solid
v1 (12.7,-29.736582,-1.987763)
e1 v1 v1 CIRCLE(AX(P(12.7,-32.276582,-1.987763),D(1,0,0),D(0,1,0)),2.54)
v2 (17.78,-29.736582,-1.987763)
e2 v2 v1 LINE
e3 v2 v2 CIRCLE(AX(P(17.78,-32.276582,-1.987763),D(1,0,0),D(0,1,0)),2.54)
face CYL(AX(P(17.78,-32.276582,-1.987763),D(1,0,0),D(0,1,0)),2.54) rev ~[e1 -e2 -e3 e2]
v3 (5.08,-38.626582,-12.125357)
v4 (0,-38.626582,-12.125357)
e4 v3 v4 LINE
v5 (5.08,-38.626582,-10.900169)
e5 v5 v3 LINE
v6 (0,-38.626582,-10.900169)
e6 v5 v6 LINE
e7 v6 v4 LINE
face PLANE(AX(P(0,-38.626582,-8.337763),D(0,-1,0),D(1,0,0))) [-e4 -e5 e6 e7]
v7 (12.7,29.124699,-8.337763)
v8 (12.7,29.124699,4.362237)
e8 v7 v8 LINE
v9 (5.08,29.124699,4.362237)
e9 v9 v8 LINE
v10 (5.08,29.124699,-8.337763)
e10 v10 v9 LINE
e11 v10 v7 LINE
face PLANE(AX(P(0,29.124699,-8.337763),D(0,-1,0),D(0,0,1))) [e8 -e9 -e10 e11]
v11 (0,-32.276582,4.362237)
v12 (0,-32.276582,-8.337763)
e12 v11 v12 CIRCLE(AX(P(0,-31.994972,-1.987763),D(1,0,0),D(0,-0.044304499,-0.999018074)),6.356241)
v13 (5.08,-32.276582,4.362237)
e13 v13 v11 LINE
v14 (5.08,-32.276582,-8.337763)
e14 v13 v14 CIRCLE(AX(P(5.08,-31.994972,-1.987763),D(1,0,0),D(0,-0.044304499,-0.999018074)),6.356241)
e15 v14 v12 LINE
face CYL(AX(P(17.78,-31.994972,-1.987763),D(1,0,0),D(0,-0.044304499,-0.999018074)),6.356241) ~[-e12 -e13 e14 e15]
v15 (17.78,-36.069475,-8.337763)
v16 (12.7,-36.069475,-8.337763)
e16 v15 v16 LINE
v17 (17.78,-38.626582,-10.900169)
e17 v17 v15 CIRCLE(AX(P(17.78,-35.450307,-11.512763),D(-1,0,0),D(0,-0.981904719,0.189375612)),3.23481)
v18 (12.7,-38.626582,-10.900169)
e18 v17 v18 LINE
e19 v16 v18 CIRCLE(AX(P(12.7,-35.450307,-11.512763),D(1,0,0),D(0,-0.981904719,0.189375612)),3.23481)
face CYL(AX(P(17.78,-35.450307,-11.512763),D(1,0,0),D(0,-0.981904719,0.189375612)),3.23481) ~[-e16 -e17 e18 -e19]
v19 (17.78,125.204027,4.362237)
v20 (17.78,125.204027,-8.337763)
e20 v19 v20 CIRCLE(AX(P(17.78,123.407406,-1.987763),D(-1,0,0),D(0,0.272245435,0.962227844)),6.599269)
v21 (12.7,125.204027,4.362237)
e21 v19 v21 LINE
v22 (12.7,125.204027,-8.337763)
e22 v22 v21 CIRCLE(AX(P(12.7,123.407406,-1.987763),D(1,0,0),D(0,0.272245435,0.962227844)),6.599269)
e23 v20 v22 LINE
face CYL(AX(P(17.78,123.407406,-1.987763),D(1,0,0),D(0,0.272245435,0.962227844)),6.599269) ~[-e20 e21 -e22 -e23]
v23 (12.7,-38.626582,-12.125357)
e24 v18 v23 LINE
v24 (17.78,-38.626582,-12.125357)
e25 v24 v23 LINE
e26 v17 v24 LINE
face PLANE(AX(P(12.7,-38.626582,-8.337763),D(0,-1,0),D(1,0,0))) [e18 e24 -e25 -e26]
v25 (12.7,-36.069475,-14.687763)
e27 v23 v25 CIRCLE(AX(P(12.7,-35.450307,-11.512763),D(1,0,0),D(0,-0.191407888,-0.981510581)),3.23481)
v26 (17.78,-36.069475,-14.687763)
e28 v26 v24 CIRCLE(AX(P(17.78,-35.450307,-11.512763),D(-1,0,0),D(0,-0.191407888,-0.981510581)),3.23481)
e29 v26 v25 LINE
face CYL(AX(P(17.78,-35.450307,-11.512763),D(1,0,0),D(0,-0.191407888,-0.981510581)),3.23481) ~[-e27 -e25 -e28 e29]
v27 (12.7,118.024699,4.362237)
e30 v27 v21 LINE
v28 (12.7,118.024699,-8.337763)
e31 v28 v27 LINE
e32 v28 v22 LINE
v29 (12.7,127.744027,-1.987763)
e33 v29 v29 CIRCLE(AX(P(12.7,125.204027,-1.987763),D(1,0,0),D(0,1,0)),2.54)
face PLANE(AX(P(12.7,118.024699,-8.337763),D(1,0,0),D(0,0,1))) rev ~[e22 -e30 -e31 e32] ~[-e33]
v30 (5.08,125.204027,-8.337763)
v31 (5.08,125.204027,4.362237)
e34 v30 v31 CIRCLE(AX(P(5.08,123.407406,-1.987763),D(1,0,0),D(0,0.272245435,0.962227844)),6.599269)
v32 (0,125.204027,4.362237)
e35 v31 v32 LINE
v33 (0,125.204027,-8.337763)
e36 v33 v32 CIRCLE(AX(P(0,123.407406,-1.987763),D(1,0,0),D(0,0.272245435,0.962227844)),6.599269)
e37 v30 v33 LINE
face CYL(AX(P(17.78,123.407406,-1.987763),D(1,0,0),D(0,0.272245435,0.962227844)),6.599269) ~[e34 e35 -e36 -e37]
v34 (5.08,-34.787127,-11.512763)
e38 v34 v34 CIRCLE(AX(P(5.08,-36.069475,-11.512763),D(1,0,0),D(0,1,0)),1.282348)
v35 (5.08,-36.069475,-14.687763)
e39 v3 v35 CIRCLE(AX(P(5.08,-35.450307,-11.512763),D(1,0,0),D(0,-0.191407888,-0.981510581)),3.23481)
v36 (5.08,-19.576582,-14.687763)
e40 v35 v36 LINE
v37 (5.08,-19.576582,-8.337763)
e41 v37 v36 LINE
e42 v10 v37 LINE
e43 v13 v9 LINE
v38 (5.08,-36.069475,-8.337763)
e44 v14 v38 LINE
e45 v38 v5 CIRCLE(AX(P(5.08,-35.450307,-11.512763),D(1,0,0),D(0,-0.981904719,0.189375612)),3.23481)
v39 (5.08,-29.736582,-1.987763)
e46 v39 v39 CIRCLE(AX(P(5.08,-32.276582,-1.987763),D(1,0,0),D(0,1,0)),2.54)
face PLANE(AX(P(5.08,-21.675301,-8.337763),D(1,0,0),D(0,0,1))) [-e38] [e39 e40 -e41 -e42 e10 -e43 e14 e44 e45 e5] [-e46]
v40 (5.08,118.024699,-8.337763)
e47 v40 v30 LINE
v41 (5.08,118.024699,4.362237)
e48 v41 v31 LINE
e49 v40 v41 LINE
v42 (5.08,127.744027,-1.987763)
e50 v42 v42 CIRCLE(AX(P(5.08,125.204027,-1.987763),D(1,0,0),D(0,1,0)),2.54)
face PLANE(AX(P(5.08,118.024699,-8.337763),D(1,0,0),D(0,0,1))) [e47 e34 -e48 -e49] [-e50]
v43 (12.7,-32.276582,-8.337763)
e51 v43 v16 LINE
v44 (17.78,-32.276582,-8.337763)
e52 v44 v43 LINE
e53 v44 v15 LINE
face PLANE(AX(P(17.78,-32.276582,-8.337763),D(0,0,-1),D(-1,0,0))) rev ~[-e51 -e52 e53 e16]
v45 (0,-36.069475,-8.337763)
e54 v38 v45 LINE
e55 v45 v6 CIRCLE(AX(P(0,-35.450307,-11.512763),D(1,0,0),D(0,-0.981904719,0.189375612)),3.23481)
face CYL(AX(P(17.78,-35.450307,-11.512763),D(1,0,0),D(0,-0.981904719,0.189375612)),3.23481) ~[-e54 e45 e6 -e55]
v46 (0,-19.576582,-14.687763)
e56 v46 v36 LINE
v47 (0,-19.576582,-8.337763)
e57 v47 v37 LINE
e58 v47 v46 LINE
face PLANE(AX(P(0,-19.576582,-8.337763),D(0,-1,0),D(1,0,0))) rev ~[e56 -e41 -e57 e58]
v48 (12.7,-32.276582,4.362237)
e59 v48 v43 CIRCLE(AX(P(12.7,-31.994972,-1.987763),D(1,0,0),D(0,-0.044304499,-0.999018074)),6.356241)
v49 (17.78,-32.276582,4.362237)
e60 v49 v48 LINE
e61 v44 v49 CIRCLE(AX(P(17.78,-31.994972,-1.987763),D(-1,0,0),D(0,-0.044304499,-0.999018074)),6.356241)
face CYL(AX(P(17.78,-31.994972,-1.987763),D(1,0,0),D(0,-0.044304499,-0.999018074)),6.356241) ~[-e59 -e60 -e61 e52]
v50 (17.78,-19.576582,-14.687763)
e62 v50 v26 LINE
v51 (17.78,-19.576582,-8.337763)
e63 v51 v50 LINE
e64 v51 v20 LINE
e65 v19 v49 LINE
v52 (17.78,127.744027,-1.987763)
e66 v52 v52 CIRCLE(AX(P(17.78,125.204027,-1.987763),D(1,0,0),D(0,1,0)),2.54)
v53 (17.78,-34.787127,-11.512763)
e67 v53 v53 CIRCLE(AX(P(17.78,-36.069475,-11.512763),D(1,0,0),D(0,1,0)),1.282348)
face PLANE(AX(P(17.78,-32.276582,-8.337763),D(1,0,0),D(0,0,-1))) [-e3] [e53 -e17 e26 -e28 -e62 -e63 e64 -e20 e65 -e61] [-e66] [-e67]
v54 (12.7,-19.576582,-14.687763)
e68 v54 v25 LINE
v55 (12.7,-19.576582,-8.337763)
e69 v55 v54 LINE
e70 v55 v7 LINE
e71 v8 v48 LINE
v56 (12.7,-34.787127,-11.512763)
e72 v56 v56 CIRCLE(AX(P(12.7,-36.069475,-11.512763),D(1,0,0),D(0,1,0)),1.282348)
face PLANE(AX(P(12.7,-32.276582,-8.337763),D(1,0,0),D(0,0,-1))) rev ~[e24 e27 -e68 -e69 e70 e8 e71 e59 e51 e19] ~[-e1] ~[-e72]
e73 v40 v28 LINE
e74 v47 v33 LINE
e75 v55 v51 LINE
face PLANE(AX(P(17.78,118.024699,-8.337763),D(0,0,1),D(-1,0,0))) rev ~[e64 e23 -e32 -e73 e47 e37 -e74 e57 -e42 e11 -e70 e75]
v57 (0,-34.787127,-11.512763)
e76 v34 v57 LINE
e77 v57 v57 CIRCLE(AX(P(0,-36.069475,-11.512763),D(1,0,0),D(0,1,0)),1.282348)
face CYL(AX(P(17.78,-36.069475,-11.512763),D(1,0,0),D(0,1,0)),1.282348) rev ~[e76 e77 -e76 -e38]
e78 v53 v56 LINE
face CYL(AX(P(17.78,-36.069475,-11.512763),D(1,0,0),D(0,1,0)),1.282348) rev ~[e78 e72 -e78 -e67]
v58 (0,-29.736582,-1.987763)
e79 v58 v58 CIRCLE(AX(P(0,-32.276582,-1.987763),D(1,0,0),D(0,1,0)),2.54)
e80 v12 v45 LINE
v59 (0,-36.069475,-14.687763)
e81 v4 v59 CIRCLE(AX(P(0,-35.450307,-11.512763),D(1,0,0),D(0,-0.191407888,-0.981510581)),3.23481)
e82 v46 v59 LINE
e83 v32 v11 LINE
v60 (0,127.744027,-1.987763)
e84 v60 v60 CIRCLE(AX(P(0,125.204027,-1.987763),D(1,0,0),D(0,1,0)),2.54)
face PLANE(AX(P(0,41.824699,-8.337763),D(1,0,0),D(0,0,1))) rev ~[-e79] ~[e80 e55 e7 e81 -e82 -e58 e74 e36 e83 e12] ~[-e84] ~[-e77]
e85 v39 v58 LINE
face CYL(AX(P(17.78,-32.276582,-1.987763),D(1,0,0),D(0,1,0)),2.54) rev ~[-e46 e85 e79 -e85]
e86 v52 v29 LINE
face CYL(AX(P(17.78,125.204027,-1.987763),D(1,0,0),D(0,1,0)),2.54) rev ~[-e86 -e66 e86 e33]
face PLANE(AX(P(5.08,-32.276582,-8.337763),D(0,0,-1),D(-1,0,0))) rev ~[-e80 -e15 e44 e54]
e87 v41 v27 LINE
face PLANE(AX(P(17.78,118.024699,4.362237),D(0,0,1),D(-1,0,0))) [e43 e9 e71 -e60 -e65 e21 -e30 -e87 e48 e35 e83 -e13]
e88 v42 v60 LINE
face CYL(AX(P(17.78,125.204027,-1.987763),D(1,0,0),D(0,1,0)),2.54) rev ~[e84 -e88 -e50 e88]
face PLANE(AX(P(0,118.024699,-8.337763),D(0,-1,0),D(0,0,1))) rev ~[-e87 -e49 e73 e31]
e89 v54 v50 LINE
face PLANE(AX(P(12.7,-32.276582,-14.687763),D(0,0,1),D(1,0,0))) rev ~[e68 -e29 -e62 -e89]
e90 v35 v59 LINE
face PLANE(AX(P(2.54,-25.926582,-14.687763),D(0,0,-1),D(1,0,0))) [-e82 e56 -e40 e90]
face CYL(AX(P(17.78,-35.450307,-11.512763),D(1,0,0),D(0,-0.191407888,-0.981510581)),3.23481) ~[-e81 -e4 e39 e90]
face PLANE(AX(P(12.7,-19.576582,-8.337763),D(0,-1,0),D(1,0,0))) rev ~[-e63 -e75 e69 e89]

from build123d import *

# Parameters (mm, degrees)
F0_W      = 63.5
F0_H      = 12.7
F1_DEPTH  = 17.78
F2_W      = 5.08
F2_H      = 12.7
F3_DEPTH  = 25.4
F4_R      = 2.54
F5_DEPTH  = 25.4
F6_DEPTH  = 50.8
F7_DEPTH  = 76.2
F8_W      = 5.08
F8_H      = 12.7
F9_DEPTH  = 12.7
F11_W     = 5.08
F11_H     = 12.7
F12_DEPTH = 6.35
F13_DEPTH = 6.35
F15_DEPTH = 25.4
F10_R     = 2.54
F16_DEPTH = 25.4
F14_R     = 1.2823476499
F17_DEPTH = 25.4


# Not quite as in the source:
# - a feature names something its author has since deleted; it is built from what else it names


with BuildPart() as f1:
    # F0 (on Right) → F1 (new body)
    with BuildSketch(Plane.YZ):
        with Locations((10.0746992975, -1.9877629941)):
            Rectangle(F0_W, F0_H)
    extrude(amount=F1_DEPTH)

    # F2 (on face) → F3 (join)
    with BuildSketch(Plane.XZ.offset(21.6753007025)):
        with Locations((2.54, -1.9877629941)):
            Rectangle(F2_W, F2_H)
        with Locations((15.24, -1.9877629941)):
            Rectangle(F2_W, F2_H)
    extrude(amount=F3_DEPTH)

    # F4 (on face) → F5 (cut)
    with BuildSketch(Plane.YZ.offset(17.78)):
        with Locations((-32.2765819728, -1.9877629941)):
            Circle(F4_R)
        with BuildLine():
            ThreePointArc((-32.2765819728, -8.3377629941), (-38.3512132445, -1.9877629941), (-32.2765819728, 4.3622370059))
            Line((-32.2765819728, 4.3622370059), (-47.0753007025, 4.3622370059))
            Line((-47.0753007025, 4.3622370059), (-47.0753007025, -8.3377629941))
            Line((-47.0753007025, -8.3377629941), (-32.2765819728, -8.3377629941))
        make_face()
    extrude(amount=-F5_DEPTH, mode=Mode.SUBTRACT)

    # F6 (cut): a face of the model
    f6_faces = [f1.faces().sort_by_distance(p)[0] for p in [
        (8.89, -21.6753007025, -1.9877629941),
    ]]
    extrude(f6_faces, amount=-F6_DEPTH, mode=Mode.SUBTRACT)

    # F7 (add): a face of the model
    f7_faces = [f1.faces().sort_by_distance(p)[0] for p in [
        (8.89, 41.8246992975, -1.9877629941),
    ]]
    extrude(f7_faces, amount=F7_DEPTH)

    # F8 (on face) → F9 (join)
    with BuildSketch(Plane(origin=(0, 118.0246992975, 0), x_dir=(-1, 0, 0), z_dir=(0, 1, 0))):
        with Locations((-15.24, -1.9877629941)):
            Rectangle(F8_W, F8_H)
        with Locations((-2.54, -1.9877629941)):
            Rectangle(F8_W, F8_H)
    extrude(amount=F9_DEPTH)

    # F11 (on face) → F12 (join)
    with BuildSketch(Plane(origin=(0, 0, -8.3377629941), x_dir=(1, 0, 0), z_dir=(0, 0, -1))):
        with Locations((15.24, 25.9265819728)):
            Rectangle(F11_W, F11_H)
        with Locations((2.54, 25.9265819728)):
            Rectangle(F11_W, F11_H)
    extrude(amount=F12_DEPTH)

    # F13 (add): faces of the model
    f13_faces = [f1.faces().sort_by_distance(p)[0] for p in [
        (15.24, -32.2765819728, -11.5127629941),
        (2.54, -32.2765819728, -11.5127629941),
    ]]
    extrude(f13_faces, amount=F13_DEPTH)

    # F14 (on face) → F15 (cut)
    with BuildSketch(Plane.YZ.offset(17.78)):
        with BuildLine():
            ThreePointArc((-38.6265819728, -10.9001689166), (-37.7400292742, -9.2277758835), (-36.0694751143, -8.3377629941))
            Line((-36.0694751143, -8.3377629941), (-38.6265819728, -8.3377629941))
            Line((-38.6265819728, -8.3377629941), (-38.6265819728, -10.9001689166))
        make_face()
        with BuildLine():
            ThreePointArc((-36.0694751143, -14.6877629941), (-37.7400292742, -13.7977501047), (-38.6265819728, -12.1253570717))
            Line((-38.6265819728, -12.1253570717), (-38.6265819728, -14.6877629941))
            Line((-38.6265819728, -14.6877629941), (-36.0694751143, -14.6877629941))
        make_face()
    extrude(amount=-F15_DEPTH, mode=Mode.SUBTRACT)

    # F10 (on face) → F16 (cut)
    with BuildSketch(Plane.YZ.offset(17.78)):
        with BuildLine():
            ThreePointArc((125.2040266991, 4.3622370059), (130.0066745518, -1.9877629941), (125.2040266991, -8.3377629941))
            Line((125.2040266991, -8.3377629941), (130.7246992975, -8.3377629941))
            Line((130.7246992975, -8.3377629941), (130.7246992975, 4.3622370059))
            Line((130.7246992975, 4.3622370059), (125.2040266991, 4.3622370059))
        make_face()
        with Locations((125.2040266991, -1.9877629941)):
            Circle(F10_R)
    extrude(amount=-F16_DEPTH, mode=Mode.SUBTRACT)

    # F14 (on face) → F17 (cut)
    with BuildSketch(Plane.YZ.offset(17.78)):
        with Locations((-36.0694751144, -11.5127629941)):
            Circle(F14_R)
    extrude(amount=-F17_DEPTH, mode=Mode.SUBTRACT)


solid = f1.part
